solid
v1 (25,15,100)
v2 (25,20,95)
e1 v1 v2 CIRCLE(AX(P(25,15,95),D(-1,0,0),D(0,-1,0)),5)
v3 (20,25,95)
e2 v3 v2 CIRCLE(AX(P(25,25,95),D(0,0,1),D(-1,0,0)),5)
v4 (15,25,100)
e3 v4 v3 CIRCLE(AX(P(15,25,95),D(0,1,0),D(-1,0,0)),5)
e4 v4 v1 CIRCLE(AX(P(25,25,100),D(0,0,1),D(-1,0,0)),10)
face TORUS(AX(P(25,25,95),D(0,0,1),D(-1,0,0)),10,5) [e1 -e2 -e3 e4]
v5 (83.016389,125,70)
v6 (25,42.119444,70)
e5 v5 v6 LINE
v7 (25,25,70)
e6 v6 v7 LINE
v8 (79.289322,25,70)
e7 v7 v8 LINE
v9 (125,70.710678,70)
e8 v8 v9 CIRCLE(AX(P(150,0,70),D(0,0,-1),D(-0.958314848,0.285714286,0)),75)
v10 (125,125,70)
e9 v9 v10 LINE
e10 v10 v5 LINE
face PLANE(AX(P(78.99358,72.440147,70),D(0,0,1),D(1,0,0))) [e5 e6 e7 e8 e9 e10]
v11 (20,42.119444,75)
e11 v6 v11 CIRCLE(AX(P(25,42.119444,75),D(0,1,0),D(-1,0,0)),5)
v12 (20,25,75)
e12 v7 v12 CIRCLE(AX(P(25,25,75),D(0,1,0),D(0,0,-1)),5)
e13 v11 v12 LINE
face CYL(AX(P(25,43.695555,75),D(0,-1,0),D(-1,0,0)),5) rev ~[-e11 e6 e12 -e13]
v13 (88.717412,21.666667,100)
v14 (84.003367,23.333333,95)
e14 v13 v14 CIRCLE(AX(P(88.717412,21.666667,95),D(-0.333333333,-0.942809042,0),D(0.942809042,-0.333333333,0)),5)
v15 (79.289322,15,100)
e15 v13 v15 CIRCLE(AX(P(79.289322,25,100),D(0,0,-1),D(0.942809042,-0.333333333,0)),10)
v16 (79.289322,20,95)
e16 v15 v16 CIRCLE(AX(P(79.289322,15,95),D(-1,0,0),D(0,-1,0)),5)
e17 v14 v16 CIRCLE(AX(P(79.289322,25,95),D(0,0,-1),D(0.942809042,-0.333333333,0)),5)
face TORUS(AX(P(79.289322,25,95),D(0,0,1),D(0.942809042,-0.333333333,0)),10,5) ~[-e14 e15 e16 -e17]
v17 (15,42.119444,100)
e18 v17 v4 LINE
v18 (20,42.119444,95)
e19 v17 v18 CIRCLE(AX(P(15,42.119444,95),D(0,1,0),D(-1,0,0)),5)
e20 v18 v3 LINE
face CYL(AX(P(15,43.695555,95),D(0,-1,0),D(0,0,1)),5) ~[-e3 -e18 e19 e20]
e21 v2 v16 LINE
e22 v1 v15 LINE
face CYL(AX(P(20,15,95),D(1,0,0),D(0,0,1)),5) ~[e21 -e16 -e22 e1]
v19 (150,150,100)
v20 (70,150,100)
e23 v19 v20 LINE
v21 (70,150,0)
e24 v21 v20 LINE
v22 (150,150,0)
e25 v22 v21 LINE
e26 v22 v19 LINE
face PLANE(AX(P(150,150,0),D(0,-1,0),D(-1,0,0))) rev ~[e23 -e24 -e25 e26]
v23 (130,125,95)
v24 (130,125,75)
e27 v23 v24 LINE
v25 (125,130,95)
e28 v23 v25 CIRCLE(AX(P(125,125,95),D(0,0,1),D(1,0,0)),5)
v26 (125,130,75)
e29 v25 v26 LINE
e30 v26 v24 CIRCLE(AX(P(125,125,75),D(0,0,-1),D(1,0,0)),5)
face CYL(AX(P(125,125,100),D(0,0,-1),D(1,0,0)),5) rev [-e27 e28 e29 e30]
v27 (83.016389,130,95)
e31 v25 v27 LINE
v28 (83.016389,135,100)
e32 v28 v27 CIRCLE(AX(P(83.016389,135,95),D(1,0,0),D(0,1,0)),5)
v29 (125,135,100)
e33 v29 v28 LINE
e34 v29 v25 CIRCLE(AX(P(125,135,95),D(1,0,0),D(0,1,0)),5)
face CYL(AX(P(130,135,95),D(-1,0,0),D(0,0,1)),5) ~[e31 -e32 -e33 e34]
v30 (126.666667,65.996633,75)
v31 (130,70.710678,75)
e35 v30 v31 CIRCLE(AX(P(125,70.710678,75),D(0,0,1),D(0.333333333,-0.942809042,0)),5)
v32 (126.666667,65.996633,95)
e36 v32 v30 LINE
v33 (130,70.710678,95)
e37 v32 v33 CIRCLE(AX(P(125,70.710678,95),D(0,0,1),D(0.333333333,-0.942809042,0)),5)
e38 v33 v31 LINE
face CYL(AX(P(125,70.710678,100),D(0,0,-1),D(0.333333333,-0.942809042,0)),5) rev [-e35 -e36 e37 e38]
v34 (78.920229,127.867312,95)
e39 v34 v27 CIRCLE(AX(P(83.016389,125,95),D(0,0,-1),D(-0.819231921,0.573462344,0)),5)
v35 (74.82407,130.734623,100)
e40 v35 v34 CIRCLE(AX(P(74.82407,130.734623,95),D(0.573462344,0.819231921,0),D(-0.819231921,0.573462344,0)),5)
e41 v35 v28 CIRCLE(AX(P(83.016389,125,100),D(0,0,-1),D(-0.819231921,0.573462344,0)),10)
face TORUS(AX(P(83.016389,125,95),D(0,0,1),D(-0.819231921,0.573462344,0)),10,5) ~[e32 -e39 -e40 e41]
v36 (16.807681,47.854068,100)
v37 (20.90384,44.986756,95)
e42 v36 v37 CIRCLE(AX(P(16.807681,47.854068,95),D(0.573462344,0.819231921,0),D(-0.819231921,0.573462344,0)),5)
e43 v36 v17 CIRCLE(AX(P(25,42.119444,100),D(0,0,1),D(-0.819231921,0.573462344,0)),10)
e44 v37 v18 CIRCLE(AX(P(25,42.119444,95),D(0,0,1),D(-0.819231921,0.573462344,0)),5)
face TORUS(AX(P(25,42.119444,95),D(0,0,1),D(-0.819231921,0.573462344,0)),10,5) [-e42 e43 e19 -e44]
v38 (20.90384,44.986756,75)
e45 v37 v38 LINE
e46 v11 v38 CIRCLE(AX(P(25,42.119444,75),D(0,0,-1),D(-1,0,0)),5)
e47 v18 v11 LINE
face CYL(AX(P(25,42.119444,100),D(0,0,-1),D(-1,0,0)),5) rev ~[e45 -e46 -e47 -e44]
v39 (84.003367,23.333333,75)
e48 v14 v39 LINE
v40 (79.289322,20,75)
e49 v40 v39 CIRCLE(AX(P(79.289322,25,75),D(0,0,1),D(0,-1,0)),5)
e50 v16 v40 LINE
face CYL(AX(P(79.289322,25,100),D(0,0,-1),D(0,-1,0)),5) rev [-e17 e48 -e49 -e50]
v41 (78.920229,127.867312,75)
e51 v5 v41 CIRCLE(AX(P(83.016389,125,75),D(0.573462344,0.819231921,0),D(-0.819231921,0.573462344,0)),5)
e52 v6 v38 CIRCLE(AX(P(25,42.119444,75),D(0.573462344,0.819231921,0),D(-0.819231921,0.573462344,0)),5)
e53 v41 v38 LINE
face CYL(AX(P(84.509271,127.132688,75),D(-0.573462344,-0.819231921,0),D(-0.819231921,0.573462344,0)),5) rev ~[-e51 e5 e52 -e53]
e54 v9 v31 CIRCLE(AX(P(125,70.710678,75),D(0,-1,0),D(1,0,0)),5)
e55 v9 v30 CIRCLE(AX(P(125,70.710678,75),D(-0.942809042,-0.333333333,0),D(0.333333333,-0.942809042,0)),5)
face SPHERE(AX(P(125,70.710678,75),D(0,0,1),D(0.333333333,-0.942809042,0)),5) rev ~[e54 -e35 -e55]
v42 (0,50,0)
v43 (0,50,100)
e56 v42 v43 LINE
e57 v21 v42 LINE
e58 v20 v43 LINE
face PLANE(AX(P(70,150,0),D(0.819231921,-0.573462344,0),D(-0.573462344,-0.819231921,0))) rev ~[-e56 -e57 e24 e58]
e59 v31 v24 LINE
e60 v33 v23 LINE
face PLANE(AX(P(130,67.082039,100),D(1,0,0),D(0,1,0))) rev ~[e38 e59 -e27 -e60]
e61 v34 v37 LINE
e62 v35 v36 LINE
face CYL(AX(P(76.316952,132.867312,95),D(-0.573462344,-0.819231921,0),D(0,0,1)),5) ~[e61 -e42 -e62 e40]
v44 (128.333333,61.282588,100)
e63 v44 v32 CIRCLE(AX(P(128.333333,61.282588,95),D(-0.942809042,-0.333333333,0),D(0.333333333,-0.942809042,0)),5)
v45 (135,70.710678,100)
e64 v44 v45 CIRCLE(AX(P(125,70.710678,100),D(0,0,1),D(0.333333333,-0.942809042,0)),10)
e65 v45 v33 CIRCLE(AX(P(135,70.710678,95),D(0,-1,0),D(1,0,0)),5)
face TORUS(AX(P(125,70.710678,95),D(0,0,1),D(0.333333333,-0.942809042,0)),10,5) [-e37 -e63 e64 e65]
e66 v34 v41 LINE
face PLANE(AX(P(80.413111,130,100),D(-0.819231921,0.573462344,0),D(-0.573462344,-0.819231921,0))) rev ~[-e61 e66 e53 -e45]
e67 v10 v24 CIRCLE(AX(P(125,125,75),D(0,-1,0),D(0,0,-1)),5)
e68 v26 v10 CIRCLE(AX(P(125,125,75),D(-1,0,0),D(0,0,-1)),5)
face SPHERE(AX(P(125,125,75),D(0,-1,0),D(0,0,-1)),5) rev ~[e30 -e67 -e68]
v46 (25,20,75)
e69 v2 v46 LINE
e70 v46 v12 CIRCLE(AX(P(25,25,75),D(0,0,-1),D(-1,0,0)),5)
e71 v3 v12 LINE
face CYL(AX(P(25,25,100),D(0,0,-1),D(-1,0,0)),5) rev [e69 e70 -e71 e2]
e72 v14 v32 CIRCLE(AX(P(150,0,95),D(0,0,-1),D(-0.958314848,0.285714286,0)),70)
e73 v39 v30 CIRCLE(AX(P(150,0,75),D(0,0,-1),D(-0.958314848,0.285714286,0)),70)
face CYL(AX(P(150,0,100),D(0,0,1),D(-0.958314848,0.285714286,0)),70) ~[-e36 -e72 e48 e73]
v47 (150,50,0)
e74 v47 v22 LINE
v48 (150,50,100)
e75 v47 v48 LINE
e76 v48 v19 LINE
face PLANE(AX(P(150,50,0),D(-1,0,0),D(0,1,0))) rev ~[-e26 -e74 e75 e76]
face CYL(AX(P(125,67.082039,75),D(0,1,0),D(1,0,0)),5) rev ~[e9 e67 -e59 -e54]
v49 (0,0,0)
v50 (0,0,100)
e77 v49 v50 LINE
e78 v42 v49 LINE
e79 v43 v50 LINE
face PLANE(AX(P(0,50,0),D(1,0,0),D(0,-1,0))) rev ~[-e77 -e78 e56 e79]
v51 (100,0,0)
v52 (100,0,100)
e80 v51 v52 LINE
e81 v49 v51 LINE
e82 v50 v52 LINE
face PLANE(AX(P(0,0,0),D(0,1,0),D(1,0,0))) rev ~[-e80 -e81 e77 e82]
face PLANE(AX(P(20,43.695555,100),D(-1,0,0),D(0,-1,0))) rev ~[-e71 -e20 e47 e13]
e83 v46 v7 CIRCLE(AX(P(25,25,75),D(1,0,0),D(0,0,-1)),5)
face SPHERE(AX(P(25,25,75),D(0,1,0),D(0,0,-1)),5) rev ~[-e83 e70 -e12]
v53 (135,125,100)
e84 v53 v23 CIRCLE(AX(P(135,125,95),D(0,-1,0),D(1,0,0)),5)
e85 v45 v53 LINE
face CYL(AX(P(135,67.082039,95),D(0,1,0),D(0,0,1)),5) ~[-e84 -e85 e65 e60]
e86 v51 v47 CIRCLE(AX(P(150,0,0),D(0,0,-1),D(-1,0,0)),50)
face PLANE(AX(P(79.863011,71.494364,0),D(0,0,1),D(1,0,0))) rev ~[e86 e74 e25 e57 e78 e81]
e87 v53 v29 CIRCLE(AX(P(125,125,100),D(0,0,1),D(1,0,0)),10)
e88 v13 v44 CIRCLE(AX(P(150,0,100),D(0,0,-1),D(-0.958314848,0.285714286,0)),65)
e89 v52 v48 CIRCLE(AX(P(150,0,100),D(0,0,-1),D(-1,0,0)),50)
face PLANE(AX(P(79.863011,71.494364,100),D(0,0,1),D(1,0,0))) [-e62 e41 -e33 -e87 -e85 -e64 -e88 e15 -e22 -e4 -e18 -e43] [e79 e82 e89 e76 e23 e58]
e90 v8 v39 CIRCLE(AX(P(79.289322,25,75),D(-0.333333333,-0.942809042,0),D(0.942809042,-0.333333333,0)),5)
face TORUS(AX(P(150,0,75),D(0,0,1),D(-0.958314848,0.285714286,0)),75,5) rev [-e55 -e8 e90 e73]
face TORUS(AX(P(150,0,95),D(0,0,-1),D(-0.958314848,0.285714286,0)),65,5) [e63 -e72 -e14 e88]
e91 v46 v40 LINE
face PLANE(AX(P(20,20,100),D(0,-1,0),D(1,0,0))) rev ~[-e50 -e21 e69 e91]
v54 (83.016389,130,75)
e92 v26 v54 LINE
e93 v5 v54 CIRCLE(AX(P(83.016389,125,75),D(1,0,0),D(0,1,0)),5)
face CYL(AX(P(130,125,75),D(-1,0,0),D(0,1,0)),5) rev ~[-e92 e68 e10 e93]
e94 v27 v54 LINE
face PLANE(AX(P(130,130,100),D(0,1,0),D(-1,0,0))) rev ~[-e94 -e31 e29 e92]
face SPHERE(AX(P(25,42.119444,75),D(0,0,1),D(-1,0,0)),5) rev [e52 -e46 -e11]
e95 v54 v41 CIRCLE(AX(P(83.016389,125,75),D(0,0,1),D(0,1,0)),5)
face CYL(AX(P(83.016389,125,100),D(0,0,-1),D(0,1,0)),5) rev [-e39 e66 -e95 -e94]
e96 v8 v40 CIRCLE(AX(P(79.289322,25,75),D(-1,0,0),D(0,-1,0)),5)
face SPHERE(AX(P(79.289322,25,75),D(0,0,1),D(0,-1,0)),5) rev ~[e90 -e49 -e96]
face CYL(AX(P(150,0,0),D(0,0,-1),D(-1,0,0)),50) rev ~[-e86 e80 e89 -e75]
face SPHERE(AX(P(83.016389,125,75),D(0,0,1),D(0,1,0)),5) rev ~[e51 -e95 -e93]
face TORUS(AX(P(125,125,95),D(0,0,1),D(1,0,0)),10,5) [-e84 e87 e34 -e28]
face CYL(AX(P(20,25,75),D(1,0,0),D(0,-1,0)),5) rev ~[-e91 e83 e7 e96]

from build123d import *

# Parameters (mm, degrees)
F1_DEPTH = 100
F3_DEPTH = 30
F4_R     = 5


with BuildPart() as f1:
    # F0 (on Top) → F1 (new body)
    with BuildSketch(Plane.XY):
        with BuildLine():
            Line((0, 50), (0, 0))
            Line((0, 0), (100, 0))
            ThreePointArc((100, 0), (114.6446609407, 35.3553390593), (150, 50))
            Line((150, 50), (150, 150))
            Line((150, 150), (70, 150))
            Line((70, 150), (0, 50))
        make_face()
    extrude(amount=F1_DEPTH)

    # F2 (on face) → F3 (cut)
    with BuildSketch(Plane.XY.offset(100)):
        with BuildLine():
            Line((20, 43.6955553836), (20, 20))
            Line((20, 20), (82.917960675, 20))
            ThreePointArc((82.917960675, 20), (100.5025253169, 49.4974746831), (130, 67.082039325))
            Line((130, 67.082039325), (130, 130))
            Line((130, 130), (80.4131112315, 130))
            Line((80.4131112315, 130), (20, 43.6955553836))
        make_face()
    extrude(amount=-F3_DEPTH, mode=Mode.SUBTRACT)

    # F4
    f4_edges = [f1.edges().sort_by_distance(p)[0] for p in [
        (20, 31.847778, 70),
        (51.45898, 20, 70),
        (100.502525, 49.497475, 70),
        (130, 98.54102, 70),
        (105.206556, 130, 70),
        (50.206556, 86.847778, 70),
        (80.413111, 130, 85),
        (20, 43.695555, 85),
        (50.206556, 86.847778, 100),
        (82.917961, 20, 85),
        (130, 67.082039, 85),
        (100.502525, 49.497475, 100),
        (20, 20, 85),
        (20, 31.847778, 100),
        (130, 130, 85),
        (130, 98.54102, 100),
        (105.206556, 130, 100),
        (51.45898, 20, 100),
    ]]
    fillet(f4_edges, radius=F4_R)


solid = f1.part
